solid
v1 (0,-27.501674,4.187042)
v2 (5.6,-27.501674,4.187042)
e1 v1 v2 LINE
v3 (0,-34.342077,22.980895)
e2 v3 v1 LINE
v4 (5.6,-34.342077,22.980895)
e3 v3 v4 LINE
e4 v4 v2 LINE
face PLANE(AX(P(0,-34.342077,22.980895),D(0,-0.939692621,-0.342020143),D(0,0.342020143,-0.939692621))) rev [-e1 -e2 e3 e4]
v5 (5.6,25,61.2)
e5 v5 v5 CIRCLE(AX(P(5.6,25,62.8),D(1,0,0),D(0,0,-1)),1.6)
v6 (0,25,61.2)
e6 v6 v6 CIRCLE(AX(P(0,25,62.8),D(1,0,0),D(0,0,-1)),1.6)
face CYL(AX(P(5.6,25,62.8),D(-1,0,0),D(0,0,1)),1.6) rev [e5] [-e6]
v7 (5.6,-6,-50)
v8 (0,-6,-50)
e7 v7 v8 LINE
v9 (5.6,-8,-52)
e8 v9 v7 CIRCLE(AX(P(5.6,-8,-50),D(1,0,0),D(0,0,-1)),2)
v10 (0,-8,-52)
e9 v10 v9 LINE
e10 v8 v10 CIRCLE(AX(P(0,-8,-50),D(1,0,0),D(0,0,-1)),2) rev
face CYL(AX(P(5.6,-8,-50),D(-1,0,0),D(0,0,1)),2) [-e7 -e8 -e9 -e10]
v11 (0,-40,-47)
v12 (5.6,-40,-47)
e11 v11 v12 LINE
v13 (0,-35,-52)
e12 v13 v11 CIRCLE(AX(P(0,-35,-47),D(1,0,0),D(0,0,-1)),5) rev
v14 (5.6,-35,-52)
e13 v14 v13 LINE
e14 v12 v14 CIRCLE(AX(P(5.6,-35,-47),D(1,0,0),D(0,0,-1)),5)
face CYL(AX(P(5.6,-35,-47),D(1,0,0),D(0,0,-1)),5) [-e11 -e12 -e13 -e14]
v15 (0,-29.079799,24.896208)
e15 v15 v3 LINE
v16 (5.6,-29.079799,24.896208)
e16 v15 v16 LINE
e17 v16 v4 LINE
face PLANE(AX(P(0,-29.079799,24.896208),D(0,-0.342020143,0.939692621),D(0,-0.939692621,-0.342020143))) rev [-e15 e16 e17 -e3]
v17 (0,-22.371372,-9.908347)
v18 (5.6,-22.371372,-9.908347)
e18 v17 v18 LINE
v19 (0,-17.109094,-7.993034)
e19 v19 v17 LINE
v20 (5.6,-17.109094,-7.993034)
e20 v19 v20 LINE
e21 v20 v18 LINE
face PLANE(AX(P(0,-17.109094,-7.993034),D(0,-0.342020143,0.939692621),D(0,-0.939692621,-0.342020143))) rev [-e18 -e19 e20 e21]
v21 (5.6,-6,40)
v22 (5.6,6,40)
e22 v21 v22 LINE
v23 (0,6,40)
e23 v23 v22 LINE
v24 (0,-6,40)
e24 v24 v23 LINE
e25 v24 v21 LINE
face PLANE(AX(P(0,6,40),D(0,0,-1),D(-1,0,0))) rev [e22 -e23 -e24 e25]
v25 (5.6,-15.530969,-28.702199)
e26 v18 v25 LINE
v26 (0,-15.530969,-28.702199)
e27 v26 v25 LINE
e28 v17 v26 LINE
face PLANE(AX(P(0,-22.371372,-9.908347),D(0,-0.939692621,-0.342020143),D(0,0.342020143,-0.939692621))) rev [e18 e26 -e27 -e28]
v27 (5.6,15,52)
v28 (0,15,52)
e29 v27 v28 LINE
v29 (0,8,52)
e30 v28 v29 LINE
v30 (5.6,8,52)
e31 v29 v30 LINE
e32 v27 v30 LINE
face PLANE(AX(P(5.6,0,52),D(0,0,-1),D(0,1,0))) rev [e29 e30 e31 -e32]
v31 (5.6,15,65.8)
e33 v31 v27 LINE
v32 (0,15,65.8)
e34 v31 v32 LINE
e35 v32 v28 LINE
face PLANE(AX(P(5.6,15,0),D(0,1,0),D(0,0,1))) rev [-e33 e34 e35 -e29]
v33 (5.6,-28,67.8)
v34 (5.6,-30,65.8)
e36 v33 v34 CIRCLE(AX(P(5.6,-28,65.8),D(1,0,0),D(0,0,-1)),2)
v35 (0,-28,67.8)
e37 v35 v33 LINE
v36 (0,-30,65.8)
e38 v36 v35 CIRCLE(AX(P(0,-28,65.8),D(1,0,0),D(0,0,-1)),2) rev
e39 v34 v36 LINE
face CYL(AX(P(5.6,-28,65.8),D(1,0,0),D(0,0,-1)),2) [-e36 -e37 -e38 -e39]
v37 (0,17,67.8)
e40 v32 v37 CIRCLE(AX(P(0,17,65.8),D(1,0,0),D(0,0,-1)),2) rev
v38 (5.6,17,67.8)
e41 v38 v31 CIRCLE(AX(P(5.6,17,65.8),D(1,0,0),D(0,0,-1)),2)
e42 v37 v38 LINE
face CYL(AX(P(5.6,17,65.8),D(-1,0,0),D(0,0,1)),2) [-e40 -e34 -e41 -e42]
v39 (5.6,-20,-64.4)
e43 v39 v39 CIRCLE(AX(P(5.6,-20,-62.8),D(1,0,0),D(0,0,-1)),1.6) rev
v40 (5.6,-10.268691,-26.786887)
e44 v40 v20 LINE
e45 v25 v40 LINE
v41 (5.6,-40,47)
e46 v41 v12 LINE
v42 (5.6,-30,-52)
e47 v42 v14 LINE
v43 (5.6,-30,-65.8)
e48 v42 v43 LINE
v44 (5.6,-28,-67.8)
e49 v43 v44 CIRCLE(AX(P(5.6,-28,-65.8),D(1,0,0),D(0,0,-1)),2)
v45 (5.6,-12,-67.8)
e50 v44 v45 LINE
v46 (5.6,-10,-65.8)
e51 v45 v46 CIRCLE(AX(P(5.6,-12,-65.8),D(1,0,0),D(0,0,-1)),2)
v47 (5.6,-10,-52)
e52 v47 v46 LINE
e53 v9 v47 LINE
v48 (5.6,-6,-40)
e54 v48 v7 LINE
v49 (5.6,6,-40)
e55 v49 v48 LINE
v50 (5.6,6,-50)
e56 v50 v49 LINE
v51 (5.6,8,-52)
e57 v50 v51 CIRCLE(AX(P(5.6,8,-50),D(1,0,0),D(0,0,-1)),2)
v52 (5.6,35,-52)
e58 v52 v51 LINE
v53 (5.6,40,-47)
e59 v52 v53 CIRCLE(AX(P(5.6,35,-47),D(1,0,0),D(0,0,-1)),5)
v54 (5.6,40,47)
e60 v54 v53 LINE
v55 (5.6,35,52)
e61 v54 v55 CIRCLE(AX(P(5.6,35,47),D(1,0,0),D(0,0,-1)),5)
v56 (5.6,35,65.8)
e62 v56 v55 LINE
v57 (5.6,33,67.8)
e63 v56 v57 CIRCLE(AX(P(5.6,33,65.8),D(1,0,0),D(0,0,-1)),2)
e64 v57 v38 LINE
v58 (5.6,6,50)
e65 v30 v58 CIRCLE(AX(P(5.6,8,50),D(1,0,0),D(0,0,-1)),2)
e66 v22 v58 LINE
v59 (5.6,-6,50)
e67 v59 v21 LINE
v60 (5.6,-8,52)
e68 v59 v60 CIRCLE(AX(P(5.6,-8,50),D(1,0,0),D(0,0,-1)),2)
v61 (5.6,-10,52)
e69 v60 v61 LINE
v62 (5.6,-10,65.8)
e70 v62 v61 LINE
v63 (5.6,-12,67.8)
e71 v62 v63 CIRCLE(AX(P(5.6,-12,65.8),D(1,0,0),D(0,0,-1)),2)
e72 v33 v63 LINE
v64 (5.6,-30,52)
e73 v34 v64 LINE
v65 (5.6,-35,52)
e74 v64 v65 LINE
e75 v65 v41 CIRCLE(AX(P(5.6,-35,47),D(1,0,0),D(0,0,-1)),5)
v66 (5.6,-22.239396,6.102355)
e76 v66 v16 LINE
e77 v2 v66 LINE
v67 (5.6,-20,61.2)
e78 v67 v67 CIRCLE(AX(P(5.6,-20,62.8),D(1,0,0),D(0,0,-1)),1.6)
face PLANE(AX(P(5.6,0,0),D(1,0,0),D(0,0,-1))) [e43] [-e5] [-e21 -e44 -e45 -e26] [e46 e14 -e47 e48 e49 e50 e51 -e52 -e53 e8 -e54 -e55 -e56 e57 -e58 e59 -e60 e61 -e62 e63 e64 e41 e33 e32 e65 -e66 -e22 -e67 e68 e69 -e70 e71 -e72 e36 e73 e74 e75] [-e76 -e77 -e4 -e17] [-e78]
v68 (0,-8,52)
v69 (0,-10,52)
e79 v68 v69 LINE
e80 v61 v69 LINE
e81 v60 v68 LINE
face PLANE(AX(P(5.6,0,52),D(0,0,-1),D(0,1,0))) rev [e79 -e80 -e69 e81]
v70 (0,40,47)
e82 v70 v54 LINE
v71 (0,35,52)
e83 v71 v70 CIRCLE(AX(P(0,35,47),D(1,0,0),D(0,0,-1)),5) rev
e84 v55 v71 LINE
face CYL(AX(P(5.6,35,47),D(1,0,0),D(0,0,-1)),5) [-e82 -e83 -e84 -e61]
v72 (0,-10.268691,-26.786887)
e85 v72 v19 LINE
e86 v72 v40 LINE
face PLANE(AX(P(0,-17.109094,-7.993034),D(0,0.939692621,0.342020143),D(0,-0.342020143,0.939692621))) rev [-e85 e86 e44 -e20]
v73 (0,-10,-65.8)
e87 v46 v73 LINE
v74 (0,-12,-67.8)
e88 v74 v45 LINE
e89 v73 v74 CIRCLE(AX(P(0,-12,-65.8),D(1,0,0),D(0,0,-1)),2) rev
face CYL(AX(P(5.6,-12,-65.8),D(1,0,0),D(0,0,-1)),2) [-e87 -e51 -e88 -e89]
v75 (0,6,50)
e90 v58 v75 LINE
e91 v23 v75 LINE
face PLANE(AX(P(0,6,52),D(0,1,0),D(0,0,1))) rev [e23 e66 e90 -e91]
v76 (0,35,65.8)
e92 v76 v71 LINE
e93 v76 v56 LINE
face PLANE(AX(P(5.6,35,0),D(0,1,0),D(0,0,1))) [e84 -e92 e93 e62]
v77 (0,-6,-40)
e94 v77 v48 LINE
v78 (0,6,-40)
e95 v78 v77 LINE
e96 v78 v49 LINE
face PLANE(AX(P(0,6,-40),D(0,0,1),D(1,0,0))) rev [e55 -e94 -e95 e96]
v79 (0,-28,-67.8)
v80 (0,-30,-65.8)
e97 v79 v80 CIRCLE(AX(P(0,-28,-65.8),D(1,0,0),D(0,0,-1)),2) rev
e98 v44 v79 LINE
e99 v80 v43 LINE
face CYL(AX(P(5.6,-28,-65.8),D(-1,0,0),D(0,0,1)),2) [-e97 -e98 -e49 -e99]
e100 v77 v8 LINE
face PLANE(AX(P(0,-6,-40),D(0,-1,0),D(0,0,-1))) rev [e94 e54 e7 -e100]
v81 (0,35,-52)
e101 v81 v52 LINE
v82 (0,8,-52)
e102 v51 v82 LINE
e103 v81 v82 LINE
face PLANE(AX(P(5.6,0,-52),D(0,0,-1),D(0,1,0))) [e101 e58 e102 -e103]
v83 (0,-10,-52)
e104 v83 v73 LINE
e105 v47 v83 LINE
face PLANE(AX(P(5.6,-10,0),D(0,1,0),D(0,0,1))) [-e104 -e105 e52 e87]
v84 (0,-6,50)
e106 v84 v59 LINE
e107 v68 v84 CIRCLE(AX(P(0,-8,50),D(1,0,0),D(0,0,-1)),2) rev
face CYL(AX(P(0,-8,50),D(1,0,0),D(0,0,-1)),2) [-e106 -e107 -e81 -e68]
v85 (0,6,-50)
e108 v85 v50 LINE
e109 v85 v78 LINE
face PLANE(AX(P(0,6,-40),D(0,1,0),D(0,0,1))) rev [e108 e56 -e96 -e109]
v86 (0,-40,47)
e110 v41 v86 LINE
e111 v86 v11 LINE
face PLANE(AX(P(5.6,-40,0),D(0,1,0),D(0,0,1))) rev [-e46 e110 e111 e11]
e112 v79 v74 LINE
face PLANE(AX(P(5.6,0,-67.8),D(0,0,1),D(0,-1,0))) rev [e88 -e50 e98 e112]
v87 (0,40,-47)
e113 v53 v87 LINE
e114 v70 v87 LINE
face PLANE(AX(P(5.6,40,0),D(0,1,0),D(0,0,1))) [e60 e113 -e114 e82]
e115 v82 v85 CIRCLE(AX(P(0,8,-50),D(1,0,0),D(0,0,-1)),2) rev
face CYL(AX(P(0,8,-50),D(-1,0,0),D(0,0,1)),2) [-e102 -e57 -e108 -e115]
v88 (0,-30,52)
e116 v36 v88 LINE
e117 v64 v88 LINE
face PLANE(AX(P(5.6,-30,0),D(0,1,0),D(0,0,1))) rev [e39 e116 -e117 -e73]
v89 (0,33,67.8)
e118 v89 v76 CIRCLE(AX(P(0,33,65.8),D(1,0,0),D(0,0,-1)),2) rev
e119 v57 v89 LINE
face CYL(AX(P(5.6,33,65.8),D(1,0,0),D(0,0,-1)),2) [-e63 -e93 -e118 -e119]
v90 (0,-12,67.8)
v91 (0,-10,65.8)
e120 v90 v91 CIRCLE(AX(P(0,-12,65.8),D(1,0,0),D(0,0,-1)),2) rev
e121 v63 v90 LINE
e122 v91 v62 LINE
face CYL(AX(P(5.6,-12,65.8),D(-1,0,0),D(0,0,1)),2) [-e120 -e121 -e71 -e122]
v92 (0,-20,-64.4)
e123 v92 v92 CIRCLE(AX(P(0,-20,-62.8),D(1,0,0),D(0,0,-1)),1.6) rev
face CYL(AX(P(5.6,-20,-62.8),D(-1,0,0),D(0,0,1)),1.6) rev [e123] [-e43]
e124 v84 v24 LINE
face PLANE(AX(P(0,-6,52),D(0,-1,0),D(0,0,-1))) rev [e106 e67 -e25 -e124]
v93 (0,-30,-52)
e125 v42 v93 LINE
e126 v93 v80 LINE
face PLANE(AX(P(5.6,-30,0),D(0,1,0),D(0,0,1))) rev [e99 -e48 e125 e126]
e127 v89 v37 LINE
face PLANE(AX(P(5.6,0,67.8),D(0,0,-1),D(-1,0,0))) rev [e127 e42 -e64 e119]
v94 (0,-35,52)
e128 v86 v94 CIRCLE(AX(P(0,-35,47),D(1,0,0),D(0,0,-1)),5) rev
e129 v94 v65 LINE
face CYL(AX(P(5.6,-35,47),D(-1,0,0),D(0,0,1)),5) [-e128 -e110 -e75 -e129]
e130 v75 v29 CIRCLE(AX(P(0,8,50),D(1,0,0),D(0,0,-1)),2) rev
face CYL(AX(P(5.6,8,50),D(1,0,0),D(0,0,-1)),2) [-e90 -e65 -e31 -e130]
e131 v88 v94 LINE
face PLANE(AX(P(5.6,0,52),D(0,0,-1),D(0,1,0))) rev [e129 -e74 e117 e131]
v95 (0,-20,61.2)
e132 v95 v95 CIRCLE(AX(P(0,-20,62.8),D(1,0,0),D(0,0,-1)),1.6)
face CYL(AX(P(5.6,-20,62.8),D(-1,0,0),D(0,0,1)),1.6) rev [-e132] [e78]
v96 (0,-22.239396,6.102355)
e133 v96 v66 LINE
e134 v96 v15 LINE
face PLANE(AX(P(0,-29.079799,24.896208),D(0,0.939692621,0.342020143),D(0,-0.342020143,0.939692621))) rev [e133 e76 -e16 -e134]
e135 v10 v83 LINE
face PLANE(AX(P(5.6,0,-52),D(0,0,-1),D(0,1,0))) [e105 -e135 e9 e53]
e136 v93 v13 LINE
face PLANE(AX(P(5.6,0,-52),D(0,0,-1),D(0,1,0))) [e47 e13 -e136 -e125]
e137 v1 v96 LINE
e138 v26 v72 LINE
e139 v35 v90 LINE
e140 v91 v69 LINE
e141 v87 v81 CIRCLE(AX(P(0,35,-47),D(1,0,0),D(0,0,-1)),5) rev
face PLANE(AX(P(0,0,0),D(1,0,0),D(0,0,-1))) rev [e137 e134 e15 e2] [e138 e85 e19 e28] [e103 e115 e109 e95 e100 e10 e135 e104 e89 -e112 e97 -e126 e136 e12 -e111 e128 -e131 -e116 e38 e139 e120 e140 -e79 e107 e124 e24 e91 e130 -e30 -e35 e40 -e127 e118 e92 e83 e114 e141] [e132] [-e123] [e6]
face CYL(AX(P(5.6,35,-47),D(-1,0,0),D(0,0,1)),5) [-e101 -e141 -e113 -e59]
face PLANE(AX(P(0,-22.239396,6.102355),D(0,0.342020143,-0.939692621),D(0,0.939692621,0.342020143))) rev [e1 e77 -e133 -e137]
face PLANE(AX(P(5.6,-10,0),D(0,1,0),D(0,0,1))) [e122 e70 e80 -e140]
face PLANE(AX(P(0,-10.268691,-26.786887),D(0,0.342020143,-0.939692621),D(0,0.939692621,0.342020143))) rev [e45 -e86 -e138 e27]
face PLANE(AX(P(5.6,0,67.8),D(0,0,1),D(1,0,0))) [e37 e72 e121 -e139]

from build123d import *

# Parameters (mm, degrees)
SKETCH_1_W          = 104
SKETCH_1_H          = 80
SKETCH_1_W_2        = 15.8
SKETCH_1_H_2        = 20
SKETCH_1_R          = 1.6
EXTRUDE_1_DEPTH     = 5.6
FILLET_1_R          = 5
CUT_EXTRUDE_1_DEPTH = 79.918945761
SKETCH_4_W          = 12
SKETCH_4_H          = 12
CUT_EXTRUDE_2_DEPTH = 79.918945761
FILLET_2_R          = 2


with BuildPart() as part:
    # ｽｹｯﾁ1 → ﾎﾞｽ - 押し出し1 (new body)
    # profile 1 of 4: a face of its own
    with BuildSketch(Plane(origin=(0, 0, 0), x_dir=(0, 0, -1), z_dir=(1, 0, 0))):
        Rectangle(SKETCH_1_W, SKETCH_1_H)
    # profile 2 of 4: a face of its own
    with BuildSketch(Plane(origin=(0, 0, 0), x_dir=(0, 0, -1), z_dir=(1, 0, 0))):
        with Locations((-59.9, 25)):
            Rectangle(SKETCH_1_W_2, SKETCH_1_H_2)
        with Locations((-62.8, 25)):
            Circle(SKETCH_1_R, mode=Mode.SUBTRACT)
    # profile 3 of 4: a face of its own
    with BuildSketch(Plane(origin=(0, 0, 0), x_dir=(0, 0, -1), z_dir=(1, 0, 0))):
        with Locations((59.9, -20)):
            Rectangle(SKETCH_1_W_2, SKETCH_1_H_2)
        with Locations((62.8, -20)):
            Circle(SKETCH_1_R, mode=Mode.SUBTRACT)
    # profile 4 of 4: a face of its own
    with BuildSketch(Plane(origin=(0, 0, 0), x_dir=(0, 0, -1), z_dir=(1, 0, 0))):
        with Locations((-59.9, -20)):
            Rectangle(SKETCH_1_W_2, SKETCH_1_H_2)
        with Locations((-62.8, -20)):
            Circle(SKETCH_1_R, mode=Mode.SUBTRACT)
    extrude(amount=EXTRUDE_1_DEPTH)

    # ﾌｨﾚｯﾄ1
    fillet_1_edges = [part.edges().sort_by_distance(p)[0] for p in [
        (2.8, -40, -52),
        (2.8, -40, 52),
        (2.8, 40, 52),
        (2.8, 40, -52),
    ]]
    fillet(fillet_1_edges, radius=FILLET_1_R - 0.0001)  # a hair under: the kernel refuses the full size

    # ｽｹｯﾁ3 → ｶｯﾄ - 押し出し1 (cut, through all)
    with BuildSketch(Plane(origin=(5.6, 0, 0), x_dir=(0, 0, -1), z_dir=(1, 0, 0))):
        Polygon((-24.896207629, -29.079798567), (-6.102355213, -22.2393957), (-4.187042411, -27.501674377), (-22.980894827, -34.342077243), align=None)
        Polygon((7.993034098, -17.10909355), (26.786886514, -10.268690684), (28.702199317, -15.53096936), (9.908346901, -22.371372227), align=None)
    extrude(amount=-CUT_EXTRUDE_1_DEPTH, mode=Mode.SUBTRACT)

    # ｽｹｯﾁ4 → ｶｯﾄ - 押し出し2 (cut, through all)
    with BuildSketch(Plane(origin=(5.6, 0, 0), x_dir=(0, 0, -1), z_dir=(1, 0, 0))):
        with Locations((-46, 0)):
            Rectangle(SKETCH_4_W, SKETCH_4_H)
        with Locations((46, 0)):
            Rectangle(SKETCH_4_W, SKETCH_4_H)
    extrude(amount=-CUT_EXTRUDE_2_DEPTH, mode=Mode.SUBTRACT)

    # ﾌｨﾚｯﾄ2
    fillet_2_edges = [part.edges().sort_by_distance(p)[0] for p in [
        (2.8, -6, 52),
        (2.8, 6, 52),
        (2.8, 6, -52),
        (2.8, -6, -52),
        (2.8, -10, -67.8),
        (2.8, -30, -67.8),
        (2.8, -30, 67.8),
        (2.8, -10, 67.8),
        (2.8, 15, 67.8),
        (2.8, 35, 67.8),
    ]]
    fillet(fillet_2_edges, radius=FILLET_2_R)


solid = part.part
